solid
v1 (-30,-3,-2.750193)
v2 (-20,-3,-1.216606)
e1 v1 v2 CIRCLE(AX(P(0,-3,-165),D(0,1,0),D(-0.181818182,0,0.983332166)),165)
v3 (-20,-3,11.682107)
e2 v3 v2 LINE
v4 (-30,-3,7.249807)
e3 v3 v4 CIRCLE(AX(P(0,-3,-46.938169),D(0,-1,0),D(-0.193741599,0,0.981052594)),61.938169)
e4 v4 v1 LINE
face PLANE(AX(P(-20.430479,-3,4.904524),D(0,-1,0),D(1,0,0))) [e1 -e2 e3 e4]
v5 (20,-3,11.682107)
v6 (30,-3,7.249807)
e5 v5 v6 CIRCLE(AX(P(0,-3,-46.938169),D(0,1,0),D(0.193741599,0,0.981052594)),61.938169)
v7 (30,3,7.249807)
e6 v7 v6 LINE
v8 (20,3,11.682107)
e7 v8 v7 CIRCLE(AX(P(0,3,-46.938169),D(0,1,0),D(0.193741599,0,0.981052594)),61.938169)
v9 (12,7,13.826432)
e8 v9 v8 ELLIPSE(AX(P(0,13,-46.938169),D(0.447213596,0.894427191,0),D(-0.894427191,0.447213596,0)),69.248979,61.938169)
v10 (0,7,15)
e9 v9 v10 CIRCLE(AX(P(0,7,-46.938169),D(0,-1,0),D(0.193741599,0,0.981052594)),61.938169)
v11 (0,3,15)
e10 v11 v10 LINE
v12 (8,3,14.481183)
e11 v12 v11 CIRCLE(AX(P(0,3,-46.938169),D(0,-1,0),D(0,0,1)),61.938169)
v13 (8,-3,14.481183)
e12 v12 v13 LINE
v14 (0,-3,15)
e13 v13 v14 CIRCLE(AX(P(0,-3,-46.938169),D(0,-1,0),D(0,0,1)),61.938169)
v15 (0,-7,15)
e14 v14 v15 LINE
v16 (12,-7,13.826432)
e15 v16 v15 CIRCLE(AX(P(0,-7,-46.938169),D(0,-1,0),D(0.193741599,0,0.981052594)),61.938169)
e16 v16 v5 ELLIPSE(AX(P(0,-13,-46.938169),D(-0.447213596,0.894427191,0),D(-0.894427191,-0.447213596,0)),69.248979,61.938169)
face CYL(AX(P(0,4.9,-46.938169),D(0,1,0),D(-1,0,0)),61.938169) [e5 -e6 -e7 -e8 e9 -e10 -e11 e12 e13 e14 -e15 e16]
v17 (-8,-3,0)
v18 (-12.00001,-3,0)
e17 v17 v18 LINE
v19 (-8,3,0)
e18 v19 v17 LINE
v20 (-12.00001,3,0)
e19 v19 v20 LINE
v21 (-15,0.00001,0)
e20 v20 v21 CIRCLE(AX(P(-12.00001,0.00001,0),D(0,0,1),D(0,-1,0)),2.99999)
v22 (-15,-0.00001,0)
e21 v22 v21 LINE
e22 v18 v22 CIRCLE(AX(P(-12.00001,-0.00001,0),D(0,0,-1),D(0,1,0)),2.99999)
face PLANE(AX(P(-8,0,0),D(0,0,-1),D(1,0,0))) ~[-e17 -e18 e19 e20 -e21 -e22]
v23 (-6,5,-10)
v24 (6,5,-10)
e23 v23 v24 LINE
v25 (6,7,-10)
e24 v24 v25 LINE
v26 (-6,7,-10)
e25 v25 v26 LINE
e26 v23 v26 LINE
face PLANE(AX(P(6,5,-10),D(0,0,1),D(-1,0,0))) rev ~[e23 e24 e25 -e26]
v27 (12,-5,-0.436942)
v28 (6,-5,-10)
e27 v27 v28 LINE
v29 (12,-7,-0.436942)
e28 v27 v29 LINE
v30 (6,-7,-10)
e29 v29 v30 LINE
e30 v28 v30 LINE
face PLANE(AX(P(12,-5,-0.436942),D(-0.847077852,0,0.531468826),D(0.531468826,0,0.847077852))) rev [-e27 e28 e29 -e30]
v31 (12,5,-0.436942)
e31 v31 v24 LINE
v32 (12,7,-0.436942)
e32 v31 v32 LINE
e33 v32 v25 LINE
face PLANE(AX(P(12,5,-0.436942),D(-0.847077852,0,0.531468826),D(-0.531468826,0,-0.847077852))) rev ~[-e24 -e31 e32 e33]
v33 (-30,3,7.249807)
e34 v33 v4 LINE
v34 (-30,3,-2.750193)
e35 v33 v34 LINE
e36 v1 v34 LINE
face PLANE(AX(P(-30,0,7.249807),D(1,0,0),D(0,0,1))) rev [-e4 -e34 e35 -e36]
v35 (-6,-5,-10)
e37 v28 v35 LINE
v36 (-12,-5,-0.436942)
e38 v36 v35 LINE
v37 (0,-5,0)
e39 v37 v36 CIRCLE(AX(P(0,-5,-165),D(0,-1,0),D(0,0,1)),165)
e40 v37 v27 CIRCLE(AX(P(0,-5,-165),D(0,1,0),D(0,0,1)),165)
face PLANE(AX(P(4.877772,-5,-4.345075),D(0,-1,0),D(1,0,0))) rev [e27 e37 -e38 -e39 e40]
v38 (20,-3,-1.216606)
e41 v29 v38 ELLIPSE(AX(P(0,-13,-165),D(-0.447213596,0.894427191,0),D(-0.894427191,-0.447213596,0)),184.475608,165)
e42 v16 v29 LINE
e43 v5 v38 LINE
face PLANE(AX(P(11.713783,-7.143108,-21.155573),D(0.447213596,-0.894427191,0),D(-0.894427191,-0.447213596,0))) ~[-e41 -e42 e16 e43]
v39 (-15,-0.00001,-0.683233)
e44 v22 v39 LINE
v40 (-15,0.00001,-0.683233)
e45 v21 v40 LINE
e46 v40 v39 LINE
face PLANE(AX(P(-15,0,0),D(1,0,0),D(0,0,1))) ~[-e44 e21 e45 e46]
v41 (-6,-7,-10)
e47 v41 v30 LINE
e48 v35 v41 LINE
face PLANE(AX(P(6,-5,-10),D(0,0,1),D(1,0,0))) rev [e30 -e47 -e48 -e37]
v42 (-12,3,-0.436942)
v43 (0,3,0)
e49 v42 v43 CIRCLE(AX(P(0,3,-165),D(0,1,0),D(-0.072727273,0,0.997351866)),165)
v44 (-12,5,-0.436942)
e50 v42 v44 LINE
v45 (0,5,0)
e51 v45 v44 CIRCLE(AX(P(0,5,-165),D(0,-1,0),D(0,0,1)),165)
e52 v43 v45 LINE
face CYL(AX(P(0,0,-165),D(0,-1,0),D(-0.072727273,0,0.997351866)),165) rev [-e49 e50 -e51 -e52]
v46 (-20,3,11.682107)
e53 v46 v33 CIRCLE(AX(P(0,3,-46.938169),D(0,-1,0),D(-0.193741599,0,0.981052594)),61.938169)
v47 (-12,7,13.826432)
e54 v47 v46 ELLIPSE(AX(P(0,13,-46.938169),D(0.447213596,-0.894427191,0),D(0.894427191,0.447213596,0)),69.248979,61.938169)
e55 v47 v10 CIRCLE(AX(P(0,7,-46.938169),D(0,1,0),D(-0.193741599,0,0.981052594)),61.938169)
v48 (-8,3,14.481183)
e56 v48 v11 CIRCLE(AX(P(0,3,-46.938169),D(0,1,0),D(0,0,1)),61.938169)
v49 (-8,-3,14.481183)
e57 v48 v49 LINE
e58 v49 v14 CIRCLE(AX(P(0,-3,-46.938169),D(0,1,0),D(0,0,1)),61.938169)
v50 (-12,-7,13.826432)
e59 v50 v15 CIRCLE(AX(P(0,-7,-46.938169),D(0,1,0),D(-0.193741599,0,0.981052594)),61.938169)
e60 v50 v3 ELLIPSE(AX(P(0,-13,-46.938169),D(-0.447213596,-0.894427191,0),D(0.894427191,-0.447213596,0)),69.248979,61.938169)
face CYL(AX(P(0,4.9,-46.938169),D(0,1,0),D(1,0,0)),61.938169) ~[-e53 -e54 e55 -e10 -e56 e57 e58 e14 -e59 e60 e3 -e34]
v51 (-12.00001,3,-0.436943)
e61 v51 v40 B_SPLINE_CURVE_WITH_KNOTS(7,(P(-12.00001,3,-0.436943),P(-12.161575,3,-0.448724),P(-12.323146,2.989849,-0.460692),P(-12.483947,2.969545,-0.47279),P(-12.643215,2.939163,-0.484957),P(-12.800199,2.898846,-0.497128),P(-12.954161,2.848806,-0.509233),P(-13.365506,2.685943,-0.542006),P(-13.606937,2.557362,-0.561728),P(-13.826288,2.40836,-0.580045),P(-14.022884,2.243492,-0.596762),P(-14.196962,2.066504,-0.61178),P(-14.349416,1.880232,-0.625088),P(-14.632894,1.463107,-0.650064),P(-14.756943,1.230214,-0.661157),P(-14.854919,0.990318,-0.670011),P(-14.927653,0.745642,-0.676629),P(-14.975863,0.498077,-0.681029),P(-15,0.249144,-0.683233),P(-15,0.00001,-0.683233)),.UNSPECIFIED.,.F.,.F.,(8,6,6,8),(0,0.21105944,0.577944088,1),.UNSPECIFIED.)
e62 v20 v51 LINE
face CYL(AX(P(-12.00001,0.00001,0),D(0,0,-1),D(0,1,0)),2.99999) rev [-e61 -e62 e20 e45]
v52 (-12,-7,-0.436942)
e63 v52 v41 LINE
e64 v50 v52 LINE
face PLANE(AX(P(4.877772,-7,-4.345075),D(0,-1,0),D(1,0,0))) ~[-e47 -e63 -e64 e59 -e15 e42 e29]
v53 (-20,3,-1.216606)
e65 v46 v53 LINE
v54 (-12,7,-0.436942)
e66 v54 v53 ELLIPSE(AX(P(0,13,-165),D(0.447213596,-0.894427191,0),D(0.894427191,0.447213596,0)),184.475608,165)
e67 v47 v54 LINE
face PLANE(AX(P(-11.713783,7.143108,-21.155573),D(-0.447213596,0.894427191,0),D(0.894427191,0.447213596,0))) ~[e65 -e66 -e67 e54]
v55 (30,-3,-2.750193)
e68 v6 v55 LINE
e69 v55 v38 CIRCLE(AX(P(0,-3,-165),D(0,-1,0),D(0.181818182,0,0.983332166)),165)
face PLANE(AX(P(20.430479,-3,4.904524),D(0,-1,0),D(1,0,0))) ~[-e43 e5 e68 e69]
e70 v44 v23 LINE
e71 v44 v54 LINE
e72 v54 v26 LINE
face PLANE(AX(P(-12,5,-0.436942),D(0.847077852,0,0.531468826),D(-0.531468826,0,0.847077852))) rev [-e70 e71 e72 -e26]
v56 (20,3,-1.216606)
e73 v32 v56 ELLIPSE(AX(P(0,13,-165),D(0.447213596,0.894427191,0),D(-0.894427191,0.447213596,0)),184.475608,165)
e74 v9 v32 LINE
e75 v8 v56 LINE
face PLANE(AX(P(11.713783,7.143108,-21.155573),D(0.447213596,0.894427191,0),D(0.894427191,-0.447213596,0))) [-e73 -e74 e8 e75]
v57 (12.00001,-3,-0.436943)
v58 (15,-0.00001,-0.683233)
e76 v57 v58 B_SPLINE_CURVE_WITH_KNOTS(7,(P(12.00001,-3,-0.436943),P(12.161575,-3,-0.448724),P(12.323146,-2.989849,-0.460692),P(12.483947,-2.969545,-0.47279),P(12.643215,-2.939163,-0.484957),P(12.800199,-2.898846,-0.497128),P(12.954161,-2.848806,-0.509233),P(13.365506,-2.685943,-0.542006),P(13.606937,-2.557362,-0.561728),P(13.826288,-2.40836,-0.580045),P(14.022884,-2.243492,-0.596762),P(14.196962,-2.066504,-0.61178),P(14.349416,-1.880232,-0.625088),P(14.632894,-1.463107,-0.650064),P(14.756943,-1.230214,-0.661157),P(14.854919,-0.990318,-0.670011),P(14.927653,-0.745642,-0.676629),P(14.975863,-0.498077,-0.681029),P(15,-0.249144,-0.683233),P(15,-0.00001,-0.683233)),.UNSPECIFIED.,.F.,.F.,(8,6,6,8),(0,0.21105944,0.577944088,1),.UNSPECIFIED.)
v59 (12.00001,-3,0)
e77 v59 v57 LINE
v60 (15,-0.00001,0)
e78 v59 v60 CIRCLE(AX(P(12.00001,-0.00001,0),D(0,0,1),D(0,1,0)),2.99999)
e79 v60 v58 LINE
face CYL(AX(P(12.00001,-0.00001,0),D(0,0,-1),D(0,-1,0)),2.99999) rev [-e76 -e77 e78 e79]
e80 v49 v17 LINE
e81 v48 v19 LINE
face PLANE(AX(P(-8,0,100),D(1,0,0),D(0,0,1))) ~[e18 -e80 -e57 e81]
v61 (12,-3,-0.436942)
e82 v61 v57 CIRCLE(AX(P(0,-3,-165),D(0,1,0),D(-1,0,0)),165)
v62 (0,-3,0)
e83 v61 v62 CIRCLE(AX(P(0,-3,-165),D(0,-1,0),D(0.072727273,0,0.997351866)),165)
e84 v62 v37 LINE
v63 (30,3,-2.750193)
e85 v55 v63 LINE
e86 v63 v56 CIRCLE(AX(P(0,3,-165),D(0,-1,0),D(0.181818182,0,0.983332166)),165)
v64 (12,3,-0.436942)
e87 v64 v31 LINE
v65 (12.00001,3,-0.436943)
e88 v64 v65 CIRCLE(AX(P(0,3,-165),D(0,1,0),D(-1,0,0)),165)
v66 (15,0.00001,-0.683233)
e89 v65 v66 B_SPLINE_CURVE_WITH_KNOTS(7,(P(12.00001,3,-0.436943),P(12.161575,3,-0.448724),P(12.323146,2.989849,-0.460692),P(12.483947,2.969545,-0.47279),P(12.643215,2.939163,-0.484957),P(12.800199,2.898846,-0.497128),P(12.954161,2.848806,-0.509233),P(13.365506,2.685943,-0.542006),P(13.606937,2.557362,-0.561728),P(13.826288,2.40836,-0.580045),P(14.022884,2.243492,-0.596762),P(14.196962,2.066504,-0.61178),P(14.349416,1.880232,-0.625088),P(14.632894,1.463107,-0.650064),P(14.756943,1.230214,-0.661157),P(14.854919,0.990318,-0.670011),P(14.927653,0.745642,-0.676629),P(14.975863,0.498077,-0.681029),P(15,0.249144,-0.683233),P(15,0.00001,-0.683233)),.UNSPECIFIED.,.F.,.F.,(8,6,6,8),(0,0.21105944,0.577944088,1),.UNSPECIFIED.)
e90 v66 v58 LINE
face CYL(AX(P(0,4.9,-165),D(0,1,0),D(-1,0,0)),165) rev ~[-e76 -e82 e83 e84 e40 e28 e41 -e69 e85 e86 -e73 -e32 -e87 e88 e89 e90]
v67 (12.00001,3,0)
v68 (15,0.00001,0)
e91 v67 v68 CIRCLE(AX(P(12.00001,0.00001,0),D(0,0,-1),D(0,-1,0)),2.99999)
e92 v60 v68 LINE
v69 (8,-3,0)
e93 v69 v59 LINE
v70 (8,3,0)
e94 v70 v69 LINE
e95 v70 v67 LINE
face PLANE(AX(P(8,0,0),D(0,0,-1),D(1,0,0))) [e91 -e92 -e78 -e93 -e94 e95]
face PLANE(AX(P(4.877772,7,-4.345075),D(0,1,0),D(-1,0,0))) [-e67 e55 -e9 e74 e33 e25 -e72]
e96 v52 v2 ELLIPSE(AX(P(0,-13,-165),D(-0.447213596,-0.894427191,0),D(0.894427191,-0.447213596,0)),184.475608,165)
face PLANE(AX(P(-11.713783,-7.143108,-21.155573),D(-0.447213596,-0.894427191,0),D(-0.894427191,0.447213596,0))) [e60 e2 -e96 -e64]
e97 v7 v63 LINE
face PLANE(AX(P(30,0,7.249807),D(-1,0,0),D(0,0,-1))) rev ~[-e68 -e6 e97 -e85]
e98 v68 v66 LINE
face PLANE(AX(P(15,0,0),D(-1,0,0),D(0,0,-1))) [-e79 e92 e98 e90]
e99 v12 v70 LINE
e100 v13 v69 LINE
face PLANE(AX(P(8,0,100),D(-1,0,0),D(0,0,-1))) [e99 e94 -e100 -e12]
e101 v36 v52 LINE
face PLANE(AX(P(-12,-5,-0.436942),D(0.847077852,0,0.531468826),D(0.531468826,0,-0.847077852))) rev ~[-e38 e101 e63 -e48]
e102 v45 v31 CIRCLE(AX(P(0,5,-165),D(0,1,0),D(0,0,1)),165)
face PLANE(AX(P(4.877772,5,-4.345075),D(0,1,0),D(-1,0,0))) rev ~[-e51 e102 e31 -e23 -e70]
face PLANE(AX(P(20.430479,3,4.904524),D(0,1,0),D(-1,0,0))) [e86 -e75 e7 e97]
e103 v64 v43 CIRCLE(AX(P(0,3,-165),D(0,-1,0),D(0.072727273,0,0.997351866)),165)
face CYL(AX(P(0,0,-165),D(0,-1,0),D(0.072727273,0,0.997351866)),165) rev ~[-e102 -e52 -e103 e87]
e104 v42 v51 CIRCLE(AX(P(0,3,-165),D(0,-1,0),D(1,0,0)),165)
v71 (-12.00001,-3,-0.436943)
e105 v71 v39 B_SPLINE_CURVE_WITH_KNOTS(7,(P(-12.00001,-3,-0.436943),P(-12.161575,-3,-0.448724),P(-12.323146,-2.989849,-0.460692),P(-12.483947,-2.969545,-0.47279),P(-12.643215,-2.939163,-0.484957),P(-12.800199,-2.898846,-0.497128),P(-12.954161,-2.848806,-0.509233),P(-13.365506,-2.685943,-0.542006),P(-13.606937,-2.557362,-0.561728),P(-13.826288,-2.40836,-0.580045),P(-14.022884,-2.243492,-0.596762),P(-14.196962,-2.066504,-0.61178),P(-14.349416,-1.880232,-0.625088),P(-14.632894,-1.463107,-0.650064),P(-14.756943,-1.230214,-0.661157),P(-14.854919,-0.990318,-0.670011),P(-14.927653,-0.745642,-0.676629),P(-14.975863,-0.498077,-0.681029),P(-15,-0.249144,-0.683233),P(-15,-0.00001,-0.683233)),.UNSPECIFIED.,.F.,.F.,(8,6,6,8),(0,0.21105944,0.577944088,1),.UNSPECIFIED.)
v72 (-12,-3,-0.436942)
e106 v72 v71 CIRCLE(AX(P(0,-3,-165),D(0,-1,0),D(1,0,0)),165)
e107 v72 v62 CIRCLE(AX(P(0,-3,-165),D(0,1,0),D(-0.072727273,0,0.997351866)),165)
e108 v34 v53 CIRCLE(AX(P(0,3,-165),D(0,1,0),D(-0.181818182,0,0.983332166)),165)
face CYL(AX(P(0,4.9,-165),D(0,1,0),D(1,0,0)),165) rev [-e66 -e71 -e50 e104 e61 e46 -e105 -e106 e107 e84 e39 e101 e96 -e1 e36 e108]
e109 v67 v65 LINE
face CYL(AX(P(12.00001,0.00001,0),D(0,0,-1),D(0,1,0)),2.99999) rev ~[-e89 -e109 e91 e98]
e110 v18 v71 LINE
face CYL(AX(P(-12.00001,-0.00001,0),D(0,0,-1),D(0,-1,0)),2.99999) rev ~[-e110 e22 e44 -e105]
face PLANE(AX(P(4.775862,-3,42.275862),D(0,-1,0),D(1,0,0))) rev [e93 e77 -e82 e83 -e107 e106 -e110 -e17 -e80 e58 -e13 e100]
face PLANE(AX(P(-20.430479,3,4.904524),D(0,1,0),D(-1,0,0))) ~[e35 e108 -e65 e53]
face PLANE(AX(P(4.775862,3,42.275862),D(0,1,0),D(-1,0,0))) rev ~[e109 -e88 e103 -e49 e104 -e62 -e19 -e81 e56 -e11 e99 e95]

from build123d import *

# Parameters (mm, degrees)
F2_DEPTH    = 3
F3_DEPTH    = 5
F4_START    = 5
F4_DEPTH    = 2
F5_T4_DEPTH = 55.7006365314
F5_S5_R     = 165
F5_T6_DEPTH = 30
F5_S7_R     = 61.9381694392
F5_T8_DEPTH = 30
F6_DEPTH    = 3
F7_R        = 2.99999


# Not quite as in the source:
# - a fillet or chamfer that OpenCascade refuses, or shapes differently, is made with other operations: its cross-section is extruded or revolved along the edge and cut away or added
# - a fillet or chamfer is up to 0.001 mm smaller than in the source, because OpenCascade refuses the exact size
# - a feature names something its author has since deleted; it is built from what else it names


with BuildPart() as f2:
    # F1 (on Front) → F2 (new body)
    with BuildSketch(Plane.XZ):
        with BuildLine():
            ThreePointArc((-30, -2.7501926041), (-21.0318278303, -1.3459068092), (-12, -0.4369421772))
            Line((-12, -0.4369421772), (-12, 13.8264323737))
            ThreePointArc((-12, 13.8264323737), (-21.2558932775, 11.2384911254), (-30, 7.2498073959))
            Line((-30, 7.2498073959), (-30, -2.7501926041))
        make_face()
        with BuildLine():
            ThreePointArc((-12, -0.4369421772), (-6.0039761506, -0.1092717271), (0, 0))
            Line((0, 0), (0, 15))
            ThreePointArc((0, 15), (-6.028624656, 14.7059099053), (-12, 13.8264323737))
            Line((-12, 13.8264323737), (-12, -0.4369421772))
        make_face()
    extrude(amount=F2_DEPTH)

    # F1 (on Front) → F3 (join)
    with BuildSketch(Plane.XZ):
        with BuildLine():
            ThreePointArc((-12, -0.4369421772), (-6.0039761506, -0.1092717271), (0, 0))
            Line((0, 0), (0, 15))
            ThreePointArc((0, 15), (-6.028624656, 14.7059099053), (-12, 13.8264323737))
            Line((-12, 13.8264323737), (-12, -0.4369421772))
        make_face()
    extrude(amount=F3_DEPTH)

    # F1 (on Front) → F4 (join)
    with BuildSketch(Plane.XZ.offset(F4_START)):
        with BuildLine():
            Line((0, -10), (0, 0))
            ThreePointArc((0, 0), (-6.0039761506, -0.1092717271), (-12, -0.4369421772))
            Line((-12, -0.4369421772), (-6, -10))
            Line((-6, -10), (0, -10))
        make_face()
        with BuildLine():
            ThreePointArc((-12, -0.4369421772), (-6.0039761506, -0.1092717271), (0, 0))
            Line((0, 0), (0, 15))
            ThreePointArc((0, 15), (-6.028624656, 14.7059099053), (-12, 13.8264323737))
            Line((-12, 13.8264323737), (-12, -0.4369421772))
        make_face()
    extrude(amount=F4_DEPTH)

    # F5: chamfer of 4 x 8 on 1 edges, made by hand


with BuildPart() as f5_tool2:
    # F5_s3 → F5_t4 (new body)
    with BuildSketch(Plane.XY.offset(-21.1555731675)):
        with BuildLine():
            Line((-11.7137832989, -7.1431083506), (-20.2862167011, -2.8568916494))
            Line((-20.2862167011, -2.8568916494), (-20.2862167011, -2.6968916494))
            ThreePointArc((-20.2862167011, -2.6968916494), (-16.1431083506, -2.84), (-12, -2.84))
            Line((-12, -2.84), (-11.84, -3))
            ThreePointArc((-11.84, -3), (-11.84, -5.0715541753), (-11.5537832989, -7.1431083506))
            Line((-11.5537832989, -7.1431083506), (-11.7137832989, -7.1431083506))
        make_face()
    extrude(amount=F5_T4_DEPTH)

    # F5_s5 → F5_t6 (cut, symmetric)
    with BuildSketch(Plane.XZ.offset(4.9)):
        with Locations((0, -165)):
            Circle(F5_S5_R)
    extrude(amount=F5_T6_DEPTH, both=True, mode=Mode.SUBTRACT)

    # F5_s7 → F5_t8 (intersect, symmetric)
    with BuildSketch(Plane.XZ.offset(4.9)):
        with Locations((0, -46.9381694392)):
            Circle(F5_S7_R)
    extrude(amount=F5_T8_DEPTH, both=True, mode=Mode.INTERSECT)

    split(bisect_by=Plane.XZ.offset(7), keep=Keep.BOTTOM)


with BuildPart() as f2_1:
    add(f2.part)

    # F5_t1: union F5_tool2
    add(f5_tool2.part)

    # F0 (on Front) → F6 (cut)
    with BuildSketch(Plane.XZ):
        Polygon((0, -20), (0, 0), (0, 110), (-6, 110), (-6, 100), (-8, 100), (-8, 0), (-15, 0), (-15, -20), align=None)
    extrude(amount=F6_DEPTH, mode=Mode.SUBTRACT)

    # F7 (radius 3 in the source; OpenCascade refuses exactly that, so slightly less here)
    f7_edges = [f2_1.edges().sort_by_distance(p)[0] for p in [
        (-15, -3, -0.341616),
    ]]
    fillet(f7_edges, radius=F7_R)

    # F8: F2 across plane


with BuildPart() as f2_2:
    add(f2_1.part)
    add(f2_1.part.mirror(Plane.XZ))

    # F9: F2 across plane


with BuildPart() as f2_3:
    add(f2_2.part)
    add(f2_2.part.mirror(Plane.YZ))


solid = f2_3.part
